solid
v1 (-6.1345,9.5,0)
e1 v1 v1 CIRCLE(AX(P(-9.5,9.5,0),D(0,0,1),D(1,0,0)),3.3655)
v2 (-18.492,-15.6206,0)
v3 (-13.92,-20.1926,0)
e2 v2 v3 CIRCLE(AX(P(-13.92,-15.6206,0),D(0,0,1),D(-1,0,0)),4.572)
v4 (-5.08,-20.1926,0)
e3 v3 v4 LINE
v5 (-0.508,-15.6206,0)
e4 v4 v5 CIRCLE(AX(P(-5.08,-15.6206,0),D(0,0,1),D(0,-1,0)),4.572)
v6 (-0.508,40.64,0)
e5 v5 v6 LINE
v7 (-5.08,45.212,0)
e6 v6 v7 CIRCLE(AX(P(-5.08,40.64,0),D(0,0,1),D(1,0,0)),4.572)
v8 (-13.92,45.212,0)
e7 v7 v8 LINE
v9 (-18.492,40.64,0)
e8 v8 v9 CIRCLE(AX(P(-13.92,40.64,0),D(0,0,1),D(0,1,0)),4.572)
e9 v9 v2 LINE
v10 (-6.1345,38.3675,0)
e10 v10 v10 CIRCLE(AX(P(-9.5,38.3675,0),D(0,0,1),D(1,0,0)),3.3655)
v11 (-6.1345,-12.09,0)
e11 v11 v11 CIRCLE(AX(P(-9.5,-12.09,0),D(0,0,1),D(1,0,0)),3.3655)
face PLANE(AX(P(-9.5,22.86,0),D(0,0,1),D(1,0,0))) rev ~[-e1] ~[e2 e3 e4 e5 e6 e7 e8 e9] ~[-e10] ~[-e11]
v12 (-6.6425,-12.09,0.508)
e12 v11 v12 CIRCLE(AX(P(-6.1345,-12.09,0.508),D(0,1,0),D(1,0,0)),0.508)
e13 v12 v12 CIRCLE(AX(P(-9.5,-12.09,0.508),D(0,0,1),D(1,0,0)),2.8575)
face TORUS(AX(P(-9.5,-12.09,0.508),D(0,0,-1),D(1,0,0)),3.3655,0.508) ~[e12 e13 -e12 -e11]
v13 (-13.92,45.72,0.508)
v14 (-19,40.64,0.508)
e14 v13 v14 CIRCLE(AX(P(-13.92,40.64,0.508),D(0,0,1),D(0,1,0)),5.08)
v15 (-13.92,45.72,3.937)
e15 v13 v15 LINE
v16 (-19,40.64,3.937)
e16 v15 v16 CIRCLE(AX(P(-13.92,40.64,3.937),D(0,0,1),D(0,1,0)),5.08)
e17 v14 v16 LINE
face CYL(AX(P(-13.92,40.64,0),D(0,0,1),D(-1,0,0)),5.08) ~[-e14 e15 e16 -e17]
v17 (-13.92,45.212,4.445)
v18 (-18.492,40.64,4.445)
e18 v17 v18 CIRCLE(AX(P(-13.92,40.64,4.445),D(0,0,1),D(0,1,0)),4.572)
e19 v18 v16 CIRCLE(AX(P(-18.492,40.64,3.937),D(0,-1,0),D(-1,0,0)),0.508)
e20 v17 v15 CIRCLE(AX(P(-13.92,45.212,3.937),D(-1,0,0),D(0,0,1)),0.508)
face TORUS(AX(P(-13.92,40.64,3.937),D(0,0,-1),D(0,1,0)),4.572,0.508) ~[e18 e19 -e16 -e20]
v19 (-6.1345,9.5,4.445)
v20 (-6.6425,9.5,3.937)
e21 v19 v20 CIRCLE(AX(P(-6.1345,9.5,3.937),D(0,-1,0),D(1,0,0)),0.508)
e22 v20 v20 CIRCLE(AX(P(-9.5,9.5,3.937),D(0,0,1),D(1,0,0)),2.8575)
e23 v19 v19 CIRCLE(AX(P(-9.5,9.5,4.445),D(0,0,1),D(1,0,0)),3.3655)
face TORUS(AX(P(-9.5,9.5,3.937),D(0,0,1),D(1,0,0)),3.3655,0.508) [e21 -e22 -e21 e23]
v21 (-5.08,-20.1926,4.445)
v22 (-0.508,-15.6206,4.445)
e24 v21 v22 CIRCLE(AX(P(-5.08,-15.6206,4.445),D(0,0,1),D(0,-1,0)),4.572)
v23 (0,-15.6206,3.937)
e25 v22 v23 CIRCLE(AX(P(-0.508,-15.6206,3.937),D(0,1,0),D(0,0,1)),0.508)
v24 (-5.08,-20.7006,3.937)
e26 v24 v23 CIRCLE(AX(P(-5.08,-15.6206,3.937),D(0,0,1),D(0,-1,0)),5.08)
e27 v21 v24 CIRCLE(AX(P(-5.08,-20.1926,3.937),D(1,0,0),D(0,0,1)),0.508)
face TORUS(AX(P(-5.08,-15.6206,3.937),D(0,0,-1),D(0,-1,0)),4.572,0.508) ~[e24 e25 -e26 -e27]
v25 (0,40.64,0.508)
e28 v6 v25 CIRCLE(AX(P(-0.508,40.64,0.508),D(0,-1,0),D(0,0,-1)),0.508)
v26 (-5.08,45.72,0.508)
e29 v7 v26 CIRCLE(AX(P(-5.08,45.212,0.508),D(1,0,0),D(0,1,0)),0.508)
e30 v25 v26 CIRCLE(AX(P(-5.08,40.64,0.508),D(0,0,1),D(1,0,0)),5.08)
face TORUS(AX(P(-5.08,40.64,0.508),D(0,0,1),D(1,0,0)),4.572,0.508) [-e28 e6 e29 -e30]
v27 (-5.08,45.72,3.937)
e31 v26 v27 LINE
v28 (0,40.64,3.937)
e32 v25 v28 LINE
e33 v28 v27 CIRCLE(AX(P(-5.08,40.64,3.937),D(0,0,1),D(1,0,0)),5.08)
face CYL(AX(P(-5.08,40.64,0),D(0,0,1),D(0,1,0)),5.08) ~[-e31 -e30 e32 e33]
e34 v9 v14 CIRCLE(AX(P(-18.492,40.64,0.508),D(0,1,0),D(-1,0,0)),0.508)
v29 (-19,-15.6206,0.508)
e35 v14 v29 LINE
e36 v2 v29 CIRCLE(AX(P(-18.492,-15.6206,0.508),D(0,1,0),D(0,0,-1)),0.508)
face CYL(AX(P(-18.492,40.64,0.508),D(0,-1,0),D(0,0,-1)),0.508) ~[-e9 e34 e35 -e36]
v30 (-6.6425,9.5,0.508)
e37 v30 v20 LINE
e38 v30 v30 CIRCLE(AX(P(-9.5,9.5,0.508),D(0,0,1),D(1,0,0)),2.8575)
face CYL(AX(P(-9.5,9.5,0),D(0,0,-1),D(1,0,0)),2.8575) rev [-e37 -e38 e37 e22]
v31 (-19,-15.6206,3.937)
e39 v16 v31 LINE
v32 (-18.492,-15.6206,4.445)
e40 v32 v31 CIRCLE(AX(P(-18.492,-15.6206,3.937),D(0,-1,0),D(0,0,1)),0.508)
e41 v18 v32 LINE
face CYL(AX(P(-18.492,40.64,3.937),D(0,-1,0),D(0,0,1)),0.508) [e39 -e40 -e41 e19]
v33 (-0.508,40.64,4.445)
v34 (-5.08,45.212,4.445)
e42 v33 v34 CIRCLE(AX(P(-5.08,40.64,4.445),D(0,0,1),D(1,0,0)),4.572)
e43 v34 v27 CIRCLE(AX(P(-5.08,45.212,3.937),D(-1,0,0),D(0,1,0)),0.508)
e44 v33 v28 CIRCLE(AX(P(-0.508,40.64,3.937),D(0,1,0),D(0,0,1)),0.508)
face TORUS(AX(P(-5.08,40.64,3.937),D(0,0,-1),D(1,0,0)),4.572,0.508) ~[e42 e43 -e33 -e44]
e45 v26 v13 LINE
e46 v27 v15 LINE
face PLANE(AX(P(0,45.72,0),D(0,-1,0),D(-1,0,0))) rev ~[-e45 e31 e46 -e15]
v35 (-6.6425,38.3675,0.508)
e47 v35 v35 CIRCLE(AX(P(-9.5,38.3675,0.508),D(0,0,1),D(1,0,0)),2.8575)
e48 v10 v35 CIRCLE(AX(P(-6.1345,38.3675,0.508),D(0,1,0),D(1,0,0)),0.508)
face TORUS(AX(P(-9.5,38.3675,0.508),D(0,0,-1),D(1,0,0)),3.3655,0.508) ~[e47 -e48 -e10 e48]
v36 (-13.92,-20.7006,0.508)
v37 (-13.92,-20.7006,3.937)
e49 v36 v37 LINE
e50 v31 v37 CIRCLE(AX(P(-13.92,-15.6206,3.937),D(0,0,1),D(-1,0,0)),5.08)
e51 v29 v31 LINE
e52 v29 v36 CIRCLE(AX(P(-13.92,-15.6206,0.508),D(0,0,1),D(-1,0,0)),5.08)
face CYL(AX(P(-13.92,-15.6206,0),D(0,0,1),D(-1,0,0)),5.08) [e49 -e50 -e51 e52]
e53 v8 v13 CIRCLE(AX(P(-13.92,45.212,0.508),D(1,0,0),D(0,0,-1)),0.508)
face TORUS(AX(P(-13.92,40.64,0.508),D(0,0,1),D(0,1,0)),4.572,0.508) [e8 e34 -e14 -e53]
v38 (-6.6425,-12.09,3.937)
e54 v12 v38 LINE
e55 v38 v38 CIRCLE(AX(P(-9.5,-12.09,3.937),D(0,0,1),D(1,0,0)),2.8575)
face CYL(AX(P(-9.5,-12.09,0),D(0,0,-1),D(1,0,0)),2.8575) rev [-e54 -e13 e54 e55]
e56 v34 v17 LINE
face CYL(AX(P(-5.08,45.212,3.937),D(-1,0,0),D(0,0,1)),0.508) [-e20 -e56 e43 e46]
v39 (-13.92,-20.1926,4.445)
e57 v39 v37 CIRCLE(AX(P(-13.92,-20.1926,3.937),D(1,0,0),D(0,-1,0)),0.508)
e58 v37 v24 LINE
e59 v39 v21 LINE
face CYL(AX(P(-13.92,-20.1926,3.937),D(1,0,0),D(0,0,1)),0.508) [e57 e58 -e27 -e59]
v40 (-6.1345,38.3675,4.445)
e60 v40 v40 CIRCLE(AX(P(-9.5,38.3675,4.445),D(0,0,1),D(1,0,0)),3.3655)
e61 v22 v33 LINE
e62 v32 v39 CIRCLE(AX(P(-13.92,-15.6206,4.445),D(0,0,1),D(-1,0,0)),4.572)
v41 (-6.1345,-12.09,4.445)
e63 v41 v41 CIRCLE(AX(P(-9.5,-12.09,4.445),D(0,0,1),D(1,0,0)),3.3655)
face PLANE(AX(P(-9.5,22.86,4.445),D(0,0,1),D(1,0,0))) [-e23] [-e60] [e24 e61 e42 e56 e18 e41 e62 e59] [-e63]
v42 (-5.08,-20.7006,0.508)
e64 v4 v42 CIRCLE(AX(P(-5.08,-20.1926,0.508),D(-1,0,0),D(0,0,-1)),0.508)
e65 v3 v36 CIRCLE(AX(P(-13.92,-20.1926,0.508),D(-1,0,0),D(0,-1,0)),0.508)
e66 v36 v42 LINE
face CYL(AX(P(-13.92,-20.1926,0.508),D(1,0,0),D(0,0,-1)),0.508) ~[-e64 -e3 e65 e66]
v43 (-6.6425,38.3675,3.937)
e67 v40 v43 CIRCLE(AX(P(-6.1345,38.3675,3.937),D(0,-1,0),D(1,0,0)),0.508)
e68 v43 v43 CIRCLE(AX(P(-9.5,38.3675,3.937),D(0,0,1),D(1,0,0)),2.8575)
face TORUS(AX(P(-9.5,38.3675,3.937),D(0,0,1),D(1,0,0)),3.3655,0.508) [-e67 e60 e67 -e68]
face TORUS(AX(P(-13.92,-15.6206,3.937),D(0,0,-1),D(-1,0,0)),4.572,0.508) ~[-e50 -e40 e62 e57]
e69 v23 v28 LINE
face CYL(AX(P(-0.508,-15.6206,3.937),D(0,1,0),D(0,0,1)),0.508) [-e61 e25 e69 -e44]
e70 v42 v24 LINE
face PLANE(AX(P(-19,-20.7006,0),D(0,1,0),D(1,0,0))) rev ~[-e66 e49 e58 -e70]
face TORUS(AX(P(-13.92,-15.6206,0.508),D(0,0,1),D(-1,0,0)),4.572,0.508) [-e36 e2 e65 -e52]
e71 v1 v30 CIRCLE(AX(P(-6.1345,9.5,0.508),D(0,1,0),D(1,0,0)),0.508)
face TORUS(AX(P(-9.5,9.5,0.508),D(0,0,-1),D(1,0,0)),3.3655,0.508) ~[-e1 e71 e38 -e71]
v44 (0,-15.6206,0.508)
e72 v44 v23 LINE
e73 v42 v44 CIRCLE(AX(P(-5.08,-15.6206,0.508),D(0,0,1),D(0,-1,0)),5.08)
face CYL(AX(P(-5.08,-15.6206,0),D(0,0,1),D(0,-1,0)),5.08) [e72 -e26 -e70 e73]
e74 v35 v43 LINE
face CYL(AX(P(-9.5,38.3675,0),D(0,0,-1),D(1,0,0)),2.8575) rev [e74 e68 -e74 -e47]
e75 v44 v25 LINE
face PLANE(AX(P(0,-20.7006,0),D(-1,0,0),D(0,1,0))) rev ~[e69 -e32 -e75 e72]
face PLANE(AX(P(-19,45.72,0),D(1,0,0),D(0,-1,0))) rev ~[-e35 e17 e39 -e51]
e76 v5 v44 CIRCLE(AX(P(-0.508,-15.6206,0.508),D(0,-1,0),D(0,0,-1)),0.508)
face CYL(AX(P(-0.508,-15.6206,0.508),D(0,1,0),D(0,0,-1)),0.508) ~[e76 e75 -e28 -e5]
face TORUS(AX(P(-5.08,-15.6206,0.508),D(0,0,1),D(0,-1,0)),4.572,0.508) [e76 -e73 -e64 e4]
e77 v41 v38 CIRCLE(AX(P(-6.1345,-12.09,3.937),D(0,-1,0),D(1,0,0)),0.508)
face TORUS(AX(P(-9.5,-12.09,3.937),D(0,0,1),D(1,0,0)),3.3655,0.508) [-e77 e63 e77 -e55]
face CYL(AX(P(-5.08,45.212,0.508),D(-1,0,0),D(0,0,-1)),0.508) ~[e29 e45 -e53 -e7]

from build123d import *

# Parameters (mm, degrees)
F0_R     = 2.8575
F0_W     = 19
F0_H     = 20.7006
F1_DEPTH = 4.445
F2_R     = 5.08
F3_R     = 0.508


# Not quite as in the source:
# - a feature names something its author has since deleted; it is built from what else it names


with BuildPart() as f1:
    # F0 (on Top) → F1 (new body)
    with BuildSketch(Plane.XY):
        Polygon((-19, 0), (0, 0), (0, 45.72), (-19, 45.72), (-19, 19), align=None)
        with Locations((-9.5, 9.5)):
            Circle(F0_R, mode=Mode.SUBTRACT)
        with Locations((-9.5, 38.3675)):
            Circle(F0_R, mode=Mode.SUBTRACT)
        with Locations((-9.5, -10.3503)):
            Rectangle(F0_W, F0_H)
        with Locations((-9.5, -12.09)):
            Circle(F0_R, mode=Mode.SUBTRACT)
    extrude(amount=F1_DEPTH)

    # F2
    f2_edges = [f1.edges().sort_by_distance(p)[0] for p in [
        (0, 45.72, 2.2225),
        (-19, 45.72, 2.2225),
        (0, -20.7006, 2.2225),
        (-19, -20.7006, 2.2225),
    ]]
    fillet(f2_edges, radius=F2_R)

    # F3
    f3_edges = [f1.edges().sort_by_distance(p)[0] for p in [
        (0, 12.5097, 4.445),
        (-12.3575, 9.5, 4.445),
        (-12.3575, 38.3675, 4.445),
        (0, 12.5097, 0),
        (-12.3575, 9.5, 0),
        (-12.3575, -12.09, 4.445),
        (-12.3575, -12.09, 0),
        (-12.3575, 38.3675, 0),
        (-9.5, 45.72, 0),
        (-9.5, 45.72, 4.445),
        (-1.487898, 44.232102, 0),
        (-17.512102, 44.232102, 0),
        (-19, 12.5097, 0),
        (-1.487898, -19.212702, 0),
        (-17.512102, -19.212702, 0),
        (-9.5, -20.7006, 0),
        (-1.487898, 44.232102, 4.445),
        (-17.512102, 44.232102, 4.445),
        (-19, 12.5097, 4.445),
        (-1.487898, -19.212702, 4.445),
        (-17.512102, -19.212702, 4.445),
        (-9.5, -20.7006, 4.445),
    ]]
    fillet(f3_edges, radius=F3_R)


solid = f1.part
